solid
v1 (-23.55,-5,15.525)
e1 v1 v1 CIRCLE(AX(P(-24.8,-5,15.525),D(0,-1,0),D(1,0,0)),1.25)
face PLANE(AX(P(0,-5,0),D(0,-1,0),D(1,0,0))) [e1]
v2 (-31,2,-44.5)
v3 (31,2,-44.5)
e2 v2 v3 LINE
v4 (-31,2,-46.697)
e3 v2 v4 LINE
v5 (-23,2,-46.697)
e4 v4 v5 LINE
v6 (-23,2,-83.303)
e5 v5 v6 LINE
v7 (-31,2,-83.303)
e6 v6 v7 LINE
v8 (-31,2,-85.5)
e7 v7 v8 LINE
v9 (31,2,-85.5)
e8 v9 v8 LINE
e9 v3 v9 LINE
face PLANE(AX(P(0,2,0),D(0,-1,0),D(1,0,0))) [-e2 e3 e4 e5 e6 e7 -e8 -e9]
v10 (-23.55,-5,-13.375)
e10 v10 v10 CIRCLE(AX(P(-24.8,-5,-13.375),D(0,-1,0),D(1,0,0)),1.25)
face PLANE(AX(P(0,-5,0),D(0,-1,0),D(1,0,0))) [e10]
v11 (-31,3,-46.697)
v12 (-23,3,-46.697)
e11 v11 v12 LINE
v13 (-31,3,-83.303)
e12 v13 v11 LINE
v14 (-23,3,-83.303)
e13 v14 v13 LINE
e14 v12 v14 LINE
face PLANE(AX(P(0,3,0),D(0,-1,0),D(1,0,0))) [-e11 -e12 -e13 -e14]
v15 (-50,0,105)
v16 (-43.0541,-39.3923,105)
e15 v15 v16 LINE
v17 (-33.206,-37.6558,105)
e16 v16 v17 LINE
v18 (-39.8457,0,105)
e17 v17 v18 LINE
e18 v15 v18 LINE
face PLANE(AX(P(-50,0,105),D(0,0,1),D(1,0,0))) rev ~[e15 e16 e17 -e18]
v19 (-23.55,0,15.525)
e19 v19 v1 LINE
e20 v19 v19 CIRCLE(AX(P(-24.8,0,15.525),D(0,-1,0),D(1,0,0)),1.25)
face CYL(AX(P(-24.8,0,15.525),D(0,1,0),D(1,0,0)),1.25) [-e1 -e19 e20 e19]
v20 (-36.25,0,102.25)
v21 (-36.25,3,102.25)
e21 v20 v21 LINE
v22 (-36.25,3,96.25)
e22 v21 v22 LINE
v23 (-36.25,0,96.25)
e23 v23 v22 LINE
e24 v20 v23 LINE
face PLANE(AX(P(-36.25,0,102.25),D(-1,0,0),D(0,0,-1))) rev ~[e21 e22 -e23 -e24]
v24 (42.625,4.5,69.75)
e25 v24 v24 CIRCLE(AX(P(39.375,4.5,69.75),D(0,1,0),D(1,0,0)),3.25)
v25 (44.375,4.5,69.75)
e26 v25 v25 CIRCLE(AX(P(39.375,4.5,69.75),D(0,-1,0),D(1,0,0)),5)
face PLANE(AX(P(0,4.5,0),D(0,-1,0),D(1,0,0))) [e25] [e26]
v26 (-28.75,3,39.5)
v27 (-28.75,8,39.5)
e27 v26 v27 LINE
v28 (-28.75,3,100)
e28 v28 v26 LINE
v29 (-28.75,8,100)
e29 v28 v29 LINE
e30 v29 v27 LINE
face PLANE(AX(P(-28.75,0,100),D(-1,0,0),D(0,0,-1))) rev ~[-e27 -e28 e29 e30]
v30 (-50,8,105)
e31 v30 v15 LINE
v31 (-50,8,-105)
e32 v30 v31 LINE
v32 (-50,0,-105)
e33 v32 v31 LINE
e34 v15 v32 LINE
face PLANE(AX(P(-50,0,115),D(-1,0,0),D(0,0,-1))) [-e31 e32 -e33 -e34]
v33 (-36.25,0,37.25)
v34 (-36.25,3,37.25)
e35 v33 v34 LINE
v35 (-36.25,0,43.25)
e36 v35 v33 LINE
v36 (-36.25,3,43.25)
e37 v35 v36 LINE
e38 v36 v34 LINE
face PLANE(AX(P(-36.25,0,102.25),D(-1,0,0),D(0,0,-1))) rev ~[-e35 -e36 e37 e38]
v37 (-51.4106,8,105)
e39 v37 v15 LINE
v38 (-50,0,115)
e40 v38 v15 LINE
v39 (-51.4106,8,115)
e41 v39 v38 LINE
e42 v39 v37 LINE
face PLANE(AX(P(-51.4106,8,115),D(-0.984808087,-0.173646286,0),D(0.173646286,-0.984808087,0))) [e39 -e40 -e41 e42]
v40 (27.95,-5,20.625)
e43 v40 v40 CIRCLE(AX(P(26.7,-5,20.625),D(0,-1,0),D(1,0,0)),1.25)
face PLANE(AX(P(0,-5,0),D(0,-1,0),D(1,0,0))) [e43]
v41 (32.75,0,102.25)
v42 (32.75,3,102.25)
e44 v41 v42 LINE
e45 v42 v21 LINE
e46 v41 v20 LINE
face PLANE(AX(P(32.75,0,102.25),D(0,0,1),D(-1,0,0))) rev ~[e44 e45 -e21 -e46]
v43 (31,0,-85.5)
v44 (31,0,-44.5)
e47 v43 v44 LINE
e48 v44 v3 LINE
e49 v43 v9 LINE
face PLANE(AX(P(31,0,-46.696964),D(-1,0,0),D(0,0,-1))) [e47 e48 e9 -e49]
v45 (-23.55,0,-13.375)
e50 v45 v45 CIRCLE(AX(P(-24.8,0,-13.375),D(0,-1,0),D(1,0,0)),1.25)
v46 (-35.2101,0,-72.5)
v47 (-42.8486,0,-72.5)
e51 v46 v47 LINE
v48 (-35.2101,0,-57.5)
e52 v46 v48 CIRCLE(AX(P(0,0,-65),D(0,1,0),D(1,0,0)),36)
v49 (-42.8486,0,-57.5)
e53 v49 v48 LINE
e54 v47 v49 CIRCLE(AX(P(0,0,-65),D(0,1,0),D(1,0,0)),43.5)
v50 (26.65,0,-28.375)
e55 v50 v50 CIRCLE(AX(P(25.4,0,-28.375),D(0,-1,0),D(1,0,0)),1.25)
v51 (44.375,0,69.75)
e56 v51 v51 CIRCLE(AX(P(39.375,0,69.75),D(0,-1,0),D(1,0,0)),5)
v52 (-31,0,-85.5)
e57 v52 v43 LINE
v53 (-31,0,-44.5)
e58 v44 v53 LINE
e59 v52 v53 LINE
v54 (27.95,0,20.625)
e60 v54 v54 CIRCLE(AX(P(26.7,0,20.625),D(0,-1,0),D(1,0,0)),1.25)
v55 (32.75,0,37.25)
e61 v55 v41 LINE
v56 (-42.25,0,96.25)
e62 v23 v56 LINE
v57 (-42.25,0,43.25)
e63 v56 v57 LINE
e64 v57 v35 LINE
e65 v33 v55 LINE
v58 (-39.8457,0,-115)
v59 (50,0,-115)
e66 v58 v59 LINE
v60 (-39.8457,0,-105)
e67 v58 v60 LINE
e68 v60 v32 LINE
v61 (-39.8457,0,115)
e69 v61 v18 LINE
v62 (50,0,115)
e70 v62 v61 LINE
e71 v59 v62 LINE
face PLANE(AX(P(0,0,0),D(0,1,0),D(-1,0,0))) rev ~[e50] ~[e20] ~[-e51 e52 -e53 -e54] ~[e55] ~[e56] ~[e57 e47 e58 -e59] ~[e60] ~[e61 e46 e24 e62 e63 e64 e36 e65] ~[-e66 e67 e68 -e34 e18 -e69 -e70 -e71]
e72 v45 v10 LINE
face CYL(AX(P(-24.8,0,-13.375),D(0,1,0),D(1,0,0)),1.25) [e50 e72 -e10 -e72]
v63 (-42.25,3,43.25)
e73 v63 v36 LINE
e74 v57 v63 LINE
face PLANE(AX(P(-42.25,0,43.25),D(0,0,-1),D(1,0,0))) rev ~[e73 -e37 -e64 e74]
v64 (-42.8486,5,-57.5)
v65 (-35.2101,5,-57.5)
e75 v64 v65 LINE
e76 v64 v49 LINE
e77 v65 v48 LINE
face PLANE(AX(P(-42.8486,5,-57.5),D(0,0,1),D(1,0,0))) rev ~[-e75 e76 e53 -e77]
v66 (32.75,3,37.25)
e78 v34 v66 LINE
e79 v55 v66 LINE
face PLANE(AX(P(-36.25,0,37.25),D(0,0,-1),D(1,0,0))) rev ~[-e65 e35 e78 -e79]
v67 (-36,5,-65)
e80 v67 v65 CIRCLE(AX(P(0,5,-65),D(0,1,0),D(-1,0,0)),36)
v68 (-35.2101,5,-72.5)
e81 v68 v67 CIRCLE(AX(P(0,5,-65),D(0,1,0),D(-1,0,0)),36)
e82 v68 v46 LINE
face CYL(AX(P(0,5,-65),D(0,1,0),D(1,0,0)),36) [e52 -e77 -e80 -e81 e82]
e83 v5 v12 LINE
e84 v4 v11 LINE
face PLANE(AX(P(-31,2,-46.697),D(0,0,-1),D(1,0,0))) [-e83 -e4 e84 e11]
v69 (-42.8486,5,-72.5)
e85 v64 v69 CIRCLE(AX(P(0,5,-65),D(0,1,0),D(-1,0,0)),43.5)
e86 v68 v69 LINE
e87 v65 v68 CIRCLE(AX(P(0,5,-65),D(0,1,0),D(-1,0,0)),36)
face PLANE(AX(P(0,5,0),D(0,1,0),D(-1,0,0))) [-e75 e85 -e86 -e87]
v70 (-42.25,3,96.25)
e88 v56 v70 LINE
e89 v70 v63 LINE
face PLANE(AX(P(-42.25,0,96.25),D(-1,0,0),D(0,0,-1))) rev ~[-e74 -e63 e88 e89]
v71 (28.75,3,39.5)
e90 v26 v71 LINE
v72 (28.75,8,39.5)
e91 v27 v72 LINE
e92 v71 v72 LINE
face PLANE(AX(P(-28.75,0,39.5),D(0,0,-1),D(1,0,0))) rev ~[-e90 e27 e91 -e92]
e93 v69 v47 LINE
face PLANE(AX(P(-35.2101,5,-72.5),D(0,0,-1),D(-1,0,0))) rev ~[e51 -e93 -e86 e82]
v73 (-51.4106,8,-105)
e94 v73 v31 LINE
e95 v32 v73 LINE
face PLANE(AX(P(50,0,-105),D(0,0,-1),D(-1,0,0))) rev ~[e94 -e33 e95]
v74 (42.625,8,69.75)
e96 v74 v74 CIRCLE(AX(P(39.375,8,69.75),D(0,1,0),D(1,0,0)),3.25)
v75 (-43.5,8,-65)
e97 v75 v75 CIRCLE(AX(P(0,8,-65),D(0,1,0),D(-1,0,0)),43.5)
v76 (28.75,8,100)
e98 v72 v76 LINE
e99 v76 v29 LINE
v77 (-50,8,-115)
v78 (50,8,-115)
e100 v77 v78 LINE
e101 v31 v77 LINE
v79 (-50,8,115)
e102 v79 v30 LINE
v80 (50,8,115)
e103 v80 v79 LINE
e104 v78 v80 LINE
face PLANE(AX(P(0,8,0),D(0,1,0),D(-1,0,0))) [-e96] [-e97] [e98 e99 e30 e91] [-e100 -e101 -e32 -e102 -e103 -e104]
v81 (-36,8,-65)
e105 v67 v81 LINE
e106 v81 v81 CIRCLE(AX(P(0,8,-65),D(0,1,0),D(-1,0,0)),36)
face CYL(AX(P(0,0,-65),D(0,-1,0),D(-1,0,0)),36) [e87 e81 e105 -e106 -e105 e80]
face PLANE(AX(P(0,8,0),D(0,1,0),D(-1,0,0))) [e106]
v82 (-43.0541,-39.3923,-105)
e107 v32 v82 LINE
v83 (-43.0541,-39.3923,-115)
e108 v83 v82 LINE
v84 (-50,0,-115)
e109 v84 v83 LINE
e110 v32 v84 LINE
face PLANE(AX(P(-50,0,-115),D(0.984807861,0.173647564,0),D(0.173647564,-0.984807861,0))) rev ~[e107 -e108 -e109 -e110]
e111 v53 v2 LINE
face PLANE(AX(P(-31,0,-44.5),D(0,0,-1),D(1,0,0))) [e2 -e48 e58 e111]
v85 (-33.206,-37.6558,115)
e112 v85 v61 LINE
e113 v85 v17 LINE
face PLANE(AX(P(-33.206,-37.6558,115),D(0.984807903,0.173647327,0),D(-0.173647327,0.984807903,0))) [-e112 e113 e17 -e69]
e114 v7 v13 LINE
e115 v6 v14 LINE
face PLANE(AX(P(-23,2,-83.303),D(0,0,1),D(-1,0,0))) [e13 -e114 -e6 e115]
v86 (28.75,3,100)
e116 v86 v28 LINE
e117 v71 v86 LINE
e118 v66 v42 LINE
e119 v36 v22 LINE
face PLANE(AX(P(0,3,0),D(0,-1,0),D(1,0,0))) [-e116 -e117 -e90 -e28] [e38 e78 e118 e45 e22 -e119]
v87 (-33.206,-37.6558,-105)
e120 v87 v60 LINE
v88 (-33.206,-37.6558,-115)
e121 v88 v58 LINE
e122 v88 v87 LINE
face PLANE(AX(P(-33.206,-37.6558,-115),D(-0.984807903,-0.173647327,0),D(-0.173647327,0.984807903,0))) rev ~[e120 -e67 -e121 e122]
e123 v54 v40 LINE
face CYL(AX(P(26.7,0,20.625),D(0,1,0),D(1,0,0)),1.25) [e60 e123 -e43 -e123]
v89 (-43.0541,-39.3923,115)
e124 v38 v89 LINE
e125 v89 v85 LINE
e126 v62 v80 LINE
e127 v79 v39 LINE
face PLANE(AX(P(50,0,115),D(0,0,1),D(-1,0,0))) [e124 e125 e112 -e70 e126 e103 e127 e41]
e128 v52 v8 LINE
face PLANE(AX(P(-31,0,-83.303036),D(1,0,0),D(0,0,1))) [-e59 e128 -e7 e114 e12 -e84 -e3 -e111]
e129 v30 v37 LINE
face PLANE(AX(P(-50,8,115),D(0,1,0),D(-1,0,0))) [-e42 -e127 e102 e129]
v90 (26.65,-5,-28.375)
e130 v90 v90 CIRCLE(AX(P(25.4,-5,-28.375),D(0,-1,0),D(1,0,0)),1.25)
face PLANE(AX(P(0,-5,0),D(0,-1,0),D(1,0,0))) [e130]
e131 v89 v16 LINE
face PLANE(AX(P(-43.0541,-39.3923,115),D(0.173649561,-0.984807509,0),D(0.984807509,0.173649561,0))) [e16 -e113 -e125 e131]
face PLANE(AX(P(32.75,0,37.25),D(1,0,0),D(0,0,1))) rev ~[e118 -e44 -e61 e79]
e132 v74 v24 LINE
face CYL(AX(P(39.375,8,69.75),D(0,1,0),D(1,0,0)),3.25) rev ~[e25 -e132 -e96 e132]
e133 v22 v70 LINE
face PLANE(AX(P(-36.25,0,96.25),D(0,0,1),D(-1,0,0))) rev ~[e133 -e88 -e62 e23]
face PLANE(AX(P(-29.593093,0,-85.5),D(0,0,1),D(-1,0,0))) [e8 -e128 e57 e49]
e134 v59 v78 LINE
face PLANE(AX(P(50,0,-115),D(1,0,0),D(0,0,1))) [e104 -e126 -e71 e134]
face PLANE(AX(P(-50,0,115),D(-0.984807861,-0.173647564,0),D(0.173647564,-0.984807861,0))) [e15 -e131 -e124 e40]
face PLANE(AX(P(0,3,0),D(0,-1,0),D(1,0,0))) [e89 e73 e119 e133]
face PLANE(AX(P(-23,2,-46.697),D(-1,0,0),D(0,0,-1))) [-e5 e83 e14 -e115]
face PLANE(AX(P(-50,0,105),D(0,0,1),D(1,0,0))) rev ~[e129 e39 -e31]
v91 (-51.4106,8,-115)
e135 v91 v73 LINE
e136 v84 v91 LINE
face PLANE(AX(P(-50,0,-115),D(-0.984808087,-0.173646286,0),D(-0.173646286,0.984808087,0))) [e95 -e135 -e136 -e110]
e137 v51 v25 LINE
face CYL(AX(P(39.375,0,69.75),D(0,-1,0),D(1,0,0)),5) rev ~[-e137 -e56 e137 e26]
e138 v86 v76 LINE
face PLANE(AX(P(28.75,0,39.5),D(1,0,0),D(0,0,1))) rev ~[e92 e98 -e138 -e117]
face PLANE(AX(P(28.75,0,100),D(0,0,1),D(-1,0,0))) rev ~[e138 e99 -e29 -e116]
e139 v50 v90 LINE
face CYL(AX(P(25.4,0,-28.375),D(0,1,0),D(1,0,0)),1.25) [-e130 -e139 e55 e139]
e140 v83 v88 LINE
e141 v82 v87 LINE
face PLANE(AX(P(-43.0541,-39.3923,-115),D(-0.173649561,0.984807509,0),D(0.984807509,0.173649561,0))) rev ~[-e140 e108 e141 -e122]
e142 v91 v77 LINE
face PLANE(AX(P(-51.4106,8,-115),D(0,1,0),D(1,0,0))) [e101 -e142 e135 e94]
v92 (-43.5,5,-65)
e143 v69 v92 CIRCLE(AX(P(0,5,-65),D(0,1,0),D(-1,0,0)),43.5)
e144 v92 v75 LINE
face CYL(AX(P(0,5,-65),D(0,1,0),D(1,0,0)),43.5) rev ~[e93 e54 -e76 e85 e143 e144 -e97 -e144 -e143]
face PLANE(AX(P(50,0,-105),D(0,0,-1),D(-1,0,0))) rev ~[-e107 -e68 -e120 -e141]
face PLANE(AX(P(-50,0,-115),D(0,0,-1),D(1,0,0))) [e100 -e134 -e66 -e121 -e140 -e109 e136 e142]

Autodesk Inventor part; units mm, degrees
ref_plane "YZ Plane" through (0, 0, 0) normal (1, 0, 0) x (0, 1, 0)
ref_plane "XZ Plane" through (0, 0, 0) normal (0, 1, 0) x (-1, 0, 0)
ref_plane "XY Plane" through (0, 0, 0) normal (0, 0, 1) x (1, 0, 0)
sketch "Sketch1" plane through (0, 0, 0) normal (0, 1, 0) x (-1, 0, 0)
  line L0 (-50, 115) -> (50, 115)
  line L1 (50, 115) -> (50, -115)
  line L2 (50, -115) -> (-50, -115)
  line L3 (-50, -115) -> (-50, 115)
  line L4 (-50, 115) -> (50, -115) construction
  line L5 (50, 115) -> (-50, -115) construction
  circle A0 centre (0, -65) radius 43.5
  circle A1 centre (0, -65) radius 36
  line L6 (-28.75, 100) -> (28.75, 100)
  line L7 (28.75, 100) -> (28.75, 39.5)
  line L8 (28.75, 39.5) -> (-28.75, 39.5)
  line L9 (-28.75, 39.5) -> (-28.75, 100)
  line L10 (-28.75, 100) -> (28.75, 39.5) construction
  line L11 (28.75, 100) -> (-28.75, 39.5) construction
  point P0 (0, 0)
  point P1 (0, 69.75)
  dimension "d0" = 7.5
  dimension "d1" = 72
  dimension "d2" = 60.5
  dimension "d3" = 57.5
  dimension "d4" = 100
  dimension "d5" = 230
  dimension "d6" = 15
  dimension "d7" = 50
extrude "Extrusion1" add sketch "Sketch1" along normal blind 8
extrude "Extrusion2" add sketch "Sketch1" along normal blind 5 contours A0
sketch "Sketch2" plane through (0, 0, 0) normal (0, -1, 0) x (1, 0, 0)
  line L0 (50, -115) -> (-50, -115) projected
  line L1 (50, 115) -> (50, -115) projected
  line L2 (-50, 115) -> (50, 115) projected
  line L3 (-50, -115) -> (-50, 115) projected
  line L4 (28.75, 100) -> (-28.75, 100) projected
  line L5 (28.75, 39.5) -> (28.75, 100) projected
  line L6 (-28.75, 39.5) -> (28.75, 39.5) projected
  line L7 (-28.75, 100) -> (-28.75, 39.5) projected
  line L8 (-36.25, 37.25) -> (32.75, 37.25)
  line L9 (32.75, 37.25) -> (32.75, 102.25)
  line L10 (32.75, 102.25) -> (-36.25, 102.25)
  line L11 (-36.25, 102.25) -> (-36.25, 37.25)
  line L12 (-36.25, 37.25) -> (32.75, 102.25) construction
  line L13 (32.75, 37.25) -> (-36.25, 102.25) construction
  point P0 (0, 0)
  point P1 (-1.75, 69.75)
  dimension "d12" = 69
  dimension "d13" = 65
  dimension "d14" = 4
  dimension "d15" = 2.25
extrude "Extrusion3" cut sketch "Sketch2" against normal blind 3 contours L11 L10 L9 L8
sketch "Sketch3" plane through (0, 5, -65) normal (0, 1, 0) x (1, 0, 0)
  circle A0 centre (0, 0) radius 36 projected
  circle A1 centre (0, 0) radius 43.5 projected
  circle A2 centre (0, 0) radius 43.5 projected
  circle A3 centre (0, 0) radius 36 projected
  circle A4 centre (0, 0) radius 36 projected
  line L0 (50, 50) -> (-50, 50) projected
  line L1 (-50, 50) -> (-50, -180) projected
  line L2 (-50, -180) -> (50, -180) projected
  line L3 (50, -180) -> (50, 50) projected
  line L4 (28.75, -165) -> (-28.75, -165) projected
  line L5 (-28.75, -165) -> (-28.75, -104.5) projected
  line L6 (-28.75, -104.5) -> (28.75, -104.5) projected
  line L7 (28.75, -104.5) -> (28.75, -165) projected
  circle A5 centre (0, 0) radius 43.5 projected
  line L8 (-35.2101, 7.5) -> (-42.8486, 7.5)
  line L9 (-42.8486, -7.5) -> (-35.2101, -7.5)
  point P0 (0, -65)
  point P1 (-39.0293, -7.5)
  point P2 (-35.2101, 7.5)
  point P3 (-42.8486, 7.5)
  dimension "d18" = 15
extrude "Extrusion4" cut sketch "Sketch3" against normal through all contours A0 L9 A1 L8 picked at (-37.9902, -5.8388)
sketch "Sketch4" plane through (0, 0, 0) normal (0, -1, 0) x (1, 0, 0)
  arc A0 (-35.2101, -72.5) -> (-35.2101, -57.5) centre (0, -65) ccw projected
  arc A1 (-42.8486, -72.5) -> (-42.8486, -57.5) centre (0, -65) ccw projected
  line L0 (-31, -44.5) -> (31, -44.5)
  line L1 (31, -44.5) -> (31, -85.5)
  line L2 (31, -85.5) -> (-31, -85.5)
  line L3 (-31, -85.5) -> (-31, -44.5)
  line L4 (-31, -44.5) -> (31, -85.5) construction
  line L5 (31, -44.5) -> (-31, -85.5) construction
  point P0 (0, 0)
  point P1 (-31, -46.697)
  point P2 (-31, -83.303)
  point P3 (-29.5931, -85.5)
  point P4 (29.5931, -85.5)
  point P5 (31, -83.303)
  point P6 (31, -46.697)
  point P7 (29.5931, -44.5)
  point P8 (-29.5931, -44.5)
  dimension "d21" = 41
  dimension "d22" = 62
extrude "Extrusion5" cut sketch "Sketch4" against normal blind 2 contours L3 A0 L0 L1 L2 | A0 L2 L3 | L3 L0 A0 | A0 L1 L2 | L0 L1 A0
sketch "Sketch5" plane through (0, 2, 0) normal (0, -1, 0) x (1, 0, 0)
  line L0 (-31, -85.5) -> (-31, -44.5) projected
  line L1 (-31, -46.697) -> (-23, -46.697)
  line L2 (-23, -46.697) -> (-23, -83.303)
  line L3 (-23, -83.303) -> (-31, -83.303)
  line L4 (-31, -83.303) -> (-31, -46.697)
  point P0 (0, 0)
  point P1 (-27, -83.303)
  dimension "d25" = 8
extrude "Extrusion6" cut sketch "Sketch5" against normal blind 1
sketch "Sketch6" plane through (0, 0, 0) normal (0, -1, 0) x (1, 0, 0)
  circle A0 centre (25.4, -28.375) radius 1.25
  circle A1 centre (26.7, 20.625) radius 1.25
  circle A2 centre (-24.8, 15.525) radius 1.25
  circle A3 centre (-24.8, -13.375) radius 1.25
  line L0 (-31, -44.5) -> (31, -44.5) projected
  line L1 (32.75, 37.25) -> (-36.25, 37.25) projected
  point P0 (0, 0)
  point P1 (25.4, -3.625)
  point P2 (-29.5931, -44.5)
  point P3 (29.5931, -44.5)
  dimension "d28" = 2.5
  dimension "d29" = 2.5
  dimension "d30" = 2.5
  dimension "d31" = 2.5
  dimension "d32" = -28.9
  dimension "d33" = -1.3
  dimension "d34" = -51.5
  dimension "d35" = -49
  dimension "d36" = -5.1
  dimension "d37" = -24.75
  dimension "d38" = 81.75
  dimension "d64" = 40.875
extrude "Extrusion7" add sketch "Sketch6" along normal blind 5
sketch "Sketch7" plane through (0, 0, 0) normal (0, -1, 0) x (1, 0, 0)
  line L0 (-36.25, 37.25) -> (-36.25, 102.25) projected
  line L1 (-36.25, 96.25) -> (-42.25, 96.25)
  line L2 (-42.25, 96.25) -> (-42.25, 43.25)
  line L3 (-42.25, 43.25) -> (-36.25, 43.25)
  line L4 (-36.25, 43.25) -> (-36.25, 96.25)
  line L5 (-36.25, 102.25) -> (32.75, 102.25) projected
  line L6 (32.75, 37.25) -> (-36.25, 37.25) projected
  point P0 (0, 0)
  point P1 (-39.25, 96.25)
  point P2 (-39.25, 43.25)
  dimension "d43" = 6
  dimension "d44" = 6
  dimension "d45" = 6
extrude "Extrusion8" cut sketch "Sketch7" against normal up to surface (3 mm away)
sketch "Sketch8" plane through (50, 0, -115) normal (0, 0, -1) x (-1, 0, 0)
  line L0 (0, 0) -> (100, 0) projected
  line L1 (100, 0) -> (100, 8)
  line L2 (100, 0) -> (93.0541, -39.3923)
  line L3 (93.0541, -39.3923) -> (83.206, -37.6558)
  line L4 (83.206, -37.6558) -> (89.8457, 0)
  line L5 (100, 0) -> (101.4106, 8)
  line L6 (101.4106, 8) -> (100, 8)
  point P0 (50, 0)
  dimension "d65" = 10
  dimension "d66" = 80
  dimension "d67" = 170
  dimension "d68" = 48.1234
  dimension "d69" = 40
  dimension "d70" = 80
  dimension "d71" = 38.2367
extrude "Extrusion9" add sketch "Sketch8" against normal blind 10
sketch "Sketch9" plane through (-50, 0, 115) normal (0, 0, 1) x (1, 0, 0)
  line L0 (0, 0) -> (10.1543, 0) projected
  line L1 (101.4106, 8) -> (100, 8) projected
  line L2 (100, 0) -> (100, 8) projected
  line L3 (100, 0) -> (101.4106, 8) projected
  line L4 (0, 0) -> (6.9459, -39.3923) projected
  line L5 (6.9459, -39.3923) -> (16.794, -37.6558) projected
  line L6 (16.794, -37.6558) -> (10.1543, 0) projected
  line L7 (0, 8) -> (-1.4106, 8) projected
  line L8 (-1.4106, 8) -> (0, 0) projected
  line L9 (0, 8) -> (0, 0) projected
  point P0 (50, 0)
extrude "Extrusion10" add sketch "Sketch9" against normal blind 10 contours L0 L6 L5 L4 | L8 L7 L9
sketch "Sketch10" plane through (0, 8, 0) normal (0, 1, 0) x (1, 0, 0)
  circle A0 centre (39.375, -69.75) radius 3.25
  line L0 (28.75, -39.5) -> (28.75, -100) projected
  line L1 (50, -115) -> (50, 115) projected
  point P0 (0, 0)
  point P1 (28.75, -69.75)
  point P2 (50, -105)
  point P3 (50, 105)
  dimension "d56" = 6.5
  dimension "d57" = 21.25
  dimension "d58" = 10.625
extrude "Extrusion11" cut sketch "Sketch10" against normal through all
sketch "Sketch11" plane through (0, 0, 0) normal (0, -1, 0) x (1, 0, 0)
  circle A0 centre (39.375, 69.75) radius 3.25 projected
  circle A1 centre (39.375, 69.75) radius 5
  point P0 (0, 0)
  dimension "d61" = 10
extrude "Extrusion12" cut sketch "Sketch11" against normal blind 4.5 contours A0 | A1
properties part number "ViesCooleHouder"
